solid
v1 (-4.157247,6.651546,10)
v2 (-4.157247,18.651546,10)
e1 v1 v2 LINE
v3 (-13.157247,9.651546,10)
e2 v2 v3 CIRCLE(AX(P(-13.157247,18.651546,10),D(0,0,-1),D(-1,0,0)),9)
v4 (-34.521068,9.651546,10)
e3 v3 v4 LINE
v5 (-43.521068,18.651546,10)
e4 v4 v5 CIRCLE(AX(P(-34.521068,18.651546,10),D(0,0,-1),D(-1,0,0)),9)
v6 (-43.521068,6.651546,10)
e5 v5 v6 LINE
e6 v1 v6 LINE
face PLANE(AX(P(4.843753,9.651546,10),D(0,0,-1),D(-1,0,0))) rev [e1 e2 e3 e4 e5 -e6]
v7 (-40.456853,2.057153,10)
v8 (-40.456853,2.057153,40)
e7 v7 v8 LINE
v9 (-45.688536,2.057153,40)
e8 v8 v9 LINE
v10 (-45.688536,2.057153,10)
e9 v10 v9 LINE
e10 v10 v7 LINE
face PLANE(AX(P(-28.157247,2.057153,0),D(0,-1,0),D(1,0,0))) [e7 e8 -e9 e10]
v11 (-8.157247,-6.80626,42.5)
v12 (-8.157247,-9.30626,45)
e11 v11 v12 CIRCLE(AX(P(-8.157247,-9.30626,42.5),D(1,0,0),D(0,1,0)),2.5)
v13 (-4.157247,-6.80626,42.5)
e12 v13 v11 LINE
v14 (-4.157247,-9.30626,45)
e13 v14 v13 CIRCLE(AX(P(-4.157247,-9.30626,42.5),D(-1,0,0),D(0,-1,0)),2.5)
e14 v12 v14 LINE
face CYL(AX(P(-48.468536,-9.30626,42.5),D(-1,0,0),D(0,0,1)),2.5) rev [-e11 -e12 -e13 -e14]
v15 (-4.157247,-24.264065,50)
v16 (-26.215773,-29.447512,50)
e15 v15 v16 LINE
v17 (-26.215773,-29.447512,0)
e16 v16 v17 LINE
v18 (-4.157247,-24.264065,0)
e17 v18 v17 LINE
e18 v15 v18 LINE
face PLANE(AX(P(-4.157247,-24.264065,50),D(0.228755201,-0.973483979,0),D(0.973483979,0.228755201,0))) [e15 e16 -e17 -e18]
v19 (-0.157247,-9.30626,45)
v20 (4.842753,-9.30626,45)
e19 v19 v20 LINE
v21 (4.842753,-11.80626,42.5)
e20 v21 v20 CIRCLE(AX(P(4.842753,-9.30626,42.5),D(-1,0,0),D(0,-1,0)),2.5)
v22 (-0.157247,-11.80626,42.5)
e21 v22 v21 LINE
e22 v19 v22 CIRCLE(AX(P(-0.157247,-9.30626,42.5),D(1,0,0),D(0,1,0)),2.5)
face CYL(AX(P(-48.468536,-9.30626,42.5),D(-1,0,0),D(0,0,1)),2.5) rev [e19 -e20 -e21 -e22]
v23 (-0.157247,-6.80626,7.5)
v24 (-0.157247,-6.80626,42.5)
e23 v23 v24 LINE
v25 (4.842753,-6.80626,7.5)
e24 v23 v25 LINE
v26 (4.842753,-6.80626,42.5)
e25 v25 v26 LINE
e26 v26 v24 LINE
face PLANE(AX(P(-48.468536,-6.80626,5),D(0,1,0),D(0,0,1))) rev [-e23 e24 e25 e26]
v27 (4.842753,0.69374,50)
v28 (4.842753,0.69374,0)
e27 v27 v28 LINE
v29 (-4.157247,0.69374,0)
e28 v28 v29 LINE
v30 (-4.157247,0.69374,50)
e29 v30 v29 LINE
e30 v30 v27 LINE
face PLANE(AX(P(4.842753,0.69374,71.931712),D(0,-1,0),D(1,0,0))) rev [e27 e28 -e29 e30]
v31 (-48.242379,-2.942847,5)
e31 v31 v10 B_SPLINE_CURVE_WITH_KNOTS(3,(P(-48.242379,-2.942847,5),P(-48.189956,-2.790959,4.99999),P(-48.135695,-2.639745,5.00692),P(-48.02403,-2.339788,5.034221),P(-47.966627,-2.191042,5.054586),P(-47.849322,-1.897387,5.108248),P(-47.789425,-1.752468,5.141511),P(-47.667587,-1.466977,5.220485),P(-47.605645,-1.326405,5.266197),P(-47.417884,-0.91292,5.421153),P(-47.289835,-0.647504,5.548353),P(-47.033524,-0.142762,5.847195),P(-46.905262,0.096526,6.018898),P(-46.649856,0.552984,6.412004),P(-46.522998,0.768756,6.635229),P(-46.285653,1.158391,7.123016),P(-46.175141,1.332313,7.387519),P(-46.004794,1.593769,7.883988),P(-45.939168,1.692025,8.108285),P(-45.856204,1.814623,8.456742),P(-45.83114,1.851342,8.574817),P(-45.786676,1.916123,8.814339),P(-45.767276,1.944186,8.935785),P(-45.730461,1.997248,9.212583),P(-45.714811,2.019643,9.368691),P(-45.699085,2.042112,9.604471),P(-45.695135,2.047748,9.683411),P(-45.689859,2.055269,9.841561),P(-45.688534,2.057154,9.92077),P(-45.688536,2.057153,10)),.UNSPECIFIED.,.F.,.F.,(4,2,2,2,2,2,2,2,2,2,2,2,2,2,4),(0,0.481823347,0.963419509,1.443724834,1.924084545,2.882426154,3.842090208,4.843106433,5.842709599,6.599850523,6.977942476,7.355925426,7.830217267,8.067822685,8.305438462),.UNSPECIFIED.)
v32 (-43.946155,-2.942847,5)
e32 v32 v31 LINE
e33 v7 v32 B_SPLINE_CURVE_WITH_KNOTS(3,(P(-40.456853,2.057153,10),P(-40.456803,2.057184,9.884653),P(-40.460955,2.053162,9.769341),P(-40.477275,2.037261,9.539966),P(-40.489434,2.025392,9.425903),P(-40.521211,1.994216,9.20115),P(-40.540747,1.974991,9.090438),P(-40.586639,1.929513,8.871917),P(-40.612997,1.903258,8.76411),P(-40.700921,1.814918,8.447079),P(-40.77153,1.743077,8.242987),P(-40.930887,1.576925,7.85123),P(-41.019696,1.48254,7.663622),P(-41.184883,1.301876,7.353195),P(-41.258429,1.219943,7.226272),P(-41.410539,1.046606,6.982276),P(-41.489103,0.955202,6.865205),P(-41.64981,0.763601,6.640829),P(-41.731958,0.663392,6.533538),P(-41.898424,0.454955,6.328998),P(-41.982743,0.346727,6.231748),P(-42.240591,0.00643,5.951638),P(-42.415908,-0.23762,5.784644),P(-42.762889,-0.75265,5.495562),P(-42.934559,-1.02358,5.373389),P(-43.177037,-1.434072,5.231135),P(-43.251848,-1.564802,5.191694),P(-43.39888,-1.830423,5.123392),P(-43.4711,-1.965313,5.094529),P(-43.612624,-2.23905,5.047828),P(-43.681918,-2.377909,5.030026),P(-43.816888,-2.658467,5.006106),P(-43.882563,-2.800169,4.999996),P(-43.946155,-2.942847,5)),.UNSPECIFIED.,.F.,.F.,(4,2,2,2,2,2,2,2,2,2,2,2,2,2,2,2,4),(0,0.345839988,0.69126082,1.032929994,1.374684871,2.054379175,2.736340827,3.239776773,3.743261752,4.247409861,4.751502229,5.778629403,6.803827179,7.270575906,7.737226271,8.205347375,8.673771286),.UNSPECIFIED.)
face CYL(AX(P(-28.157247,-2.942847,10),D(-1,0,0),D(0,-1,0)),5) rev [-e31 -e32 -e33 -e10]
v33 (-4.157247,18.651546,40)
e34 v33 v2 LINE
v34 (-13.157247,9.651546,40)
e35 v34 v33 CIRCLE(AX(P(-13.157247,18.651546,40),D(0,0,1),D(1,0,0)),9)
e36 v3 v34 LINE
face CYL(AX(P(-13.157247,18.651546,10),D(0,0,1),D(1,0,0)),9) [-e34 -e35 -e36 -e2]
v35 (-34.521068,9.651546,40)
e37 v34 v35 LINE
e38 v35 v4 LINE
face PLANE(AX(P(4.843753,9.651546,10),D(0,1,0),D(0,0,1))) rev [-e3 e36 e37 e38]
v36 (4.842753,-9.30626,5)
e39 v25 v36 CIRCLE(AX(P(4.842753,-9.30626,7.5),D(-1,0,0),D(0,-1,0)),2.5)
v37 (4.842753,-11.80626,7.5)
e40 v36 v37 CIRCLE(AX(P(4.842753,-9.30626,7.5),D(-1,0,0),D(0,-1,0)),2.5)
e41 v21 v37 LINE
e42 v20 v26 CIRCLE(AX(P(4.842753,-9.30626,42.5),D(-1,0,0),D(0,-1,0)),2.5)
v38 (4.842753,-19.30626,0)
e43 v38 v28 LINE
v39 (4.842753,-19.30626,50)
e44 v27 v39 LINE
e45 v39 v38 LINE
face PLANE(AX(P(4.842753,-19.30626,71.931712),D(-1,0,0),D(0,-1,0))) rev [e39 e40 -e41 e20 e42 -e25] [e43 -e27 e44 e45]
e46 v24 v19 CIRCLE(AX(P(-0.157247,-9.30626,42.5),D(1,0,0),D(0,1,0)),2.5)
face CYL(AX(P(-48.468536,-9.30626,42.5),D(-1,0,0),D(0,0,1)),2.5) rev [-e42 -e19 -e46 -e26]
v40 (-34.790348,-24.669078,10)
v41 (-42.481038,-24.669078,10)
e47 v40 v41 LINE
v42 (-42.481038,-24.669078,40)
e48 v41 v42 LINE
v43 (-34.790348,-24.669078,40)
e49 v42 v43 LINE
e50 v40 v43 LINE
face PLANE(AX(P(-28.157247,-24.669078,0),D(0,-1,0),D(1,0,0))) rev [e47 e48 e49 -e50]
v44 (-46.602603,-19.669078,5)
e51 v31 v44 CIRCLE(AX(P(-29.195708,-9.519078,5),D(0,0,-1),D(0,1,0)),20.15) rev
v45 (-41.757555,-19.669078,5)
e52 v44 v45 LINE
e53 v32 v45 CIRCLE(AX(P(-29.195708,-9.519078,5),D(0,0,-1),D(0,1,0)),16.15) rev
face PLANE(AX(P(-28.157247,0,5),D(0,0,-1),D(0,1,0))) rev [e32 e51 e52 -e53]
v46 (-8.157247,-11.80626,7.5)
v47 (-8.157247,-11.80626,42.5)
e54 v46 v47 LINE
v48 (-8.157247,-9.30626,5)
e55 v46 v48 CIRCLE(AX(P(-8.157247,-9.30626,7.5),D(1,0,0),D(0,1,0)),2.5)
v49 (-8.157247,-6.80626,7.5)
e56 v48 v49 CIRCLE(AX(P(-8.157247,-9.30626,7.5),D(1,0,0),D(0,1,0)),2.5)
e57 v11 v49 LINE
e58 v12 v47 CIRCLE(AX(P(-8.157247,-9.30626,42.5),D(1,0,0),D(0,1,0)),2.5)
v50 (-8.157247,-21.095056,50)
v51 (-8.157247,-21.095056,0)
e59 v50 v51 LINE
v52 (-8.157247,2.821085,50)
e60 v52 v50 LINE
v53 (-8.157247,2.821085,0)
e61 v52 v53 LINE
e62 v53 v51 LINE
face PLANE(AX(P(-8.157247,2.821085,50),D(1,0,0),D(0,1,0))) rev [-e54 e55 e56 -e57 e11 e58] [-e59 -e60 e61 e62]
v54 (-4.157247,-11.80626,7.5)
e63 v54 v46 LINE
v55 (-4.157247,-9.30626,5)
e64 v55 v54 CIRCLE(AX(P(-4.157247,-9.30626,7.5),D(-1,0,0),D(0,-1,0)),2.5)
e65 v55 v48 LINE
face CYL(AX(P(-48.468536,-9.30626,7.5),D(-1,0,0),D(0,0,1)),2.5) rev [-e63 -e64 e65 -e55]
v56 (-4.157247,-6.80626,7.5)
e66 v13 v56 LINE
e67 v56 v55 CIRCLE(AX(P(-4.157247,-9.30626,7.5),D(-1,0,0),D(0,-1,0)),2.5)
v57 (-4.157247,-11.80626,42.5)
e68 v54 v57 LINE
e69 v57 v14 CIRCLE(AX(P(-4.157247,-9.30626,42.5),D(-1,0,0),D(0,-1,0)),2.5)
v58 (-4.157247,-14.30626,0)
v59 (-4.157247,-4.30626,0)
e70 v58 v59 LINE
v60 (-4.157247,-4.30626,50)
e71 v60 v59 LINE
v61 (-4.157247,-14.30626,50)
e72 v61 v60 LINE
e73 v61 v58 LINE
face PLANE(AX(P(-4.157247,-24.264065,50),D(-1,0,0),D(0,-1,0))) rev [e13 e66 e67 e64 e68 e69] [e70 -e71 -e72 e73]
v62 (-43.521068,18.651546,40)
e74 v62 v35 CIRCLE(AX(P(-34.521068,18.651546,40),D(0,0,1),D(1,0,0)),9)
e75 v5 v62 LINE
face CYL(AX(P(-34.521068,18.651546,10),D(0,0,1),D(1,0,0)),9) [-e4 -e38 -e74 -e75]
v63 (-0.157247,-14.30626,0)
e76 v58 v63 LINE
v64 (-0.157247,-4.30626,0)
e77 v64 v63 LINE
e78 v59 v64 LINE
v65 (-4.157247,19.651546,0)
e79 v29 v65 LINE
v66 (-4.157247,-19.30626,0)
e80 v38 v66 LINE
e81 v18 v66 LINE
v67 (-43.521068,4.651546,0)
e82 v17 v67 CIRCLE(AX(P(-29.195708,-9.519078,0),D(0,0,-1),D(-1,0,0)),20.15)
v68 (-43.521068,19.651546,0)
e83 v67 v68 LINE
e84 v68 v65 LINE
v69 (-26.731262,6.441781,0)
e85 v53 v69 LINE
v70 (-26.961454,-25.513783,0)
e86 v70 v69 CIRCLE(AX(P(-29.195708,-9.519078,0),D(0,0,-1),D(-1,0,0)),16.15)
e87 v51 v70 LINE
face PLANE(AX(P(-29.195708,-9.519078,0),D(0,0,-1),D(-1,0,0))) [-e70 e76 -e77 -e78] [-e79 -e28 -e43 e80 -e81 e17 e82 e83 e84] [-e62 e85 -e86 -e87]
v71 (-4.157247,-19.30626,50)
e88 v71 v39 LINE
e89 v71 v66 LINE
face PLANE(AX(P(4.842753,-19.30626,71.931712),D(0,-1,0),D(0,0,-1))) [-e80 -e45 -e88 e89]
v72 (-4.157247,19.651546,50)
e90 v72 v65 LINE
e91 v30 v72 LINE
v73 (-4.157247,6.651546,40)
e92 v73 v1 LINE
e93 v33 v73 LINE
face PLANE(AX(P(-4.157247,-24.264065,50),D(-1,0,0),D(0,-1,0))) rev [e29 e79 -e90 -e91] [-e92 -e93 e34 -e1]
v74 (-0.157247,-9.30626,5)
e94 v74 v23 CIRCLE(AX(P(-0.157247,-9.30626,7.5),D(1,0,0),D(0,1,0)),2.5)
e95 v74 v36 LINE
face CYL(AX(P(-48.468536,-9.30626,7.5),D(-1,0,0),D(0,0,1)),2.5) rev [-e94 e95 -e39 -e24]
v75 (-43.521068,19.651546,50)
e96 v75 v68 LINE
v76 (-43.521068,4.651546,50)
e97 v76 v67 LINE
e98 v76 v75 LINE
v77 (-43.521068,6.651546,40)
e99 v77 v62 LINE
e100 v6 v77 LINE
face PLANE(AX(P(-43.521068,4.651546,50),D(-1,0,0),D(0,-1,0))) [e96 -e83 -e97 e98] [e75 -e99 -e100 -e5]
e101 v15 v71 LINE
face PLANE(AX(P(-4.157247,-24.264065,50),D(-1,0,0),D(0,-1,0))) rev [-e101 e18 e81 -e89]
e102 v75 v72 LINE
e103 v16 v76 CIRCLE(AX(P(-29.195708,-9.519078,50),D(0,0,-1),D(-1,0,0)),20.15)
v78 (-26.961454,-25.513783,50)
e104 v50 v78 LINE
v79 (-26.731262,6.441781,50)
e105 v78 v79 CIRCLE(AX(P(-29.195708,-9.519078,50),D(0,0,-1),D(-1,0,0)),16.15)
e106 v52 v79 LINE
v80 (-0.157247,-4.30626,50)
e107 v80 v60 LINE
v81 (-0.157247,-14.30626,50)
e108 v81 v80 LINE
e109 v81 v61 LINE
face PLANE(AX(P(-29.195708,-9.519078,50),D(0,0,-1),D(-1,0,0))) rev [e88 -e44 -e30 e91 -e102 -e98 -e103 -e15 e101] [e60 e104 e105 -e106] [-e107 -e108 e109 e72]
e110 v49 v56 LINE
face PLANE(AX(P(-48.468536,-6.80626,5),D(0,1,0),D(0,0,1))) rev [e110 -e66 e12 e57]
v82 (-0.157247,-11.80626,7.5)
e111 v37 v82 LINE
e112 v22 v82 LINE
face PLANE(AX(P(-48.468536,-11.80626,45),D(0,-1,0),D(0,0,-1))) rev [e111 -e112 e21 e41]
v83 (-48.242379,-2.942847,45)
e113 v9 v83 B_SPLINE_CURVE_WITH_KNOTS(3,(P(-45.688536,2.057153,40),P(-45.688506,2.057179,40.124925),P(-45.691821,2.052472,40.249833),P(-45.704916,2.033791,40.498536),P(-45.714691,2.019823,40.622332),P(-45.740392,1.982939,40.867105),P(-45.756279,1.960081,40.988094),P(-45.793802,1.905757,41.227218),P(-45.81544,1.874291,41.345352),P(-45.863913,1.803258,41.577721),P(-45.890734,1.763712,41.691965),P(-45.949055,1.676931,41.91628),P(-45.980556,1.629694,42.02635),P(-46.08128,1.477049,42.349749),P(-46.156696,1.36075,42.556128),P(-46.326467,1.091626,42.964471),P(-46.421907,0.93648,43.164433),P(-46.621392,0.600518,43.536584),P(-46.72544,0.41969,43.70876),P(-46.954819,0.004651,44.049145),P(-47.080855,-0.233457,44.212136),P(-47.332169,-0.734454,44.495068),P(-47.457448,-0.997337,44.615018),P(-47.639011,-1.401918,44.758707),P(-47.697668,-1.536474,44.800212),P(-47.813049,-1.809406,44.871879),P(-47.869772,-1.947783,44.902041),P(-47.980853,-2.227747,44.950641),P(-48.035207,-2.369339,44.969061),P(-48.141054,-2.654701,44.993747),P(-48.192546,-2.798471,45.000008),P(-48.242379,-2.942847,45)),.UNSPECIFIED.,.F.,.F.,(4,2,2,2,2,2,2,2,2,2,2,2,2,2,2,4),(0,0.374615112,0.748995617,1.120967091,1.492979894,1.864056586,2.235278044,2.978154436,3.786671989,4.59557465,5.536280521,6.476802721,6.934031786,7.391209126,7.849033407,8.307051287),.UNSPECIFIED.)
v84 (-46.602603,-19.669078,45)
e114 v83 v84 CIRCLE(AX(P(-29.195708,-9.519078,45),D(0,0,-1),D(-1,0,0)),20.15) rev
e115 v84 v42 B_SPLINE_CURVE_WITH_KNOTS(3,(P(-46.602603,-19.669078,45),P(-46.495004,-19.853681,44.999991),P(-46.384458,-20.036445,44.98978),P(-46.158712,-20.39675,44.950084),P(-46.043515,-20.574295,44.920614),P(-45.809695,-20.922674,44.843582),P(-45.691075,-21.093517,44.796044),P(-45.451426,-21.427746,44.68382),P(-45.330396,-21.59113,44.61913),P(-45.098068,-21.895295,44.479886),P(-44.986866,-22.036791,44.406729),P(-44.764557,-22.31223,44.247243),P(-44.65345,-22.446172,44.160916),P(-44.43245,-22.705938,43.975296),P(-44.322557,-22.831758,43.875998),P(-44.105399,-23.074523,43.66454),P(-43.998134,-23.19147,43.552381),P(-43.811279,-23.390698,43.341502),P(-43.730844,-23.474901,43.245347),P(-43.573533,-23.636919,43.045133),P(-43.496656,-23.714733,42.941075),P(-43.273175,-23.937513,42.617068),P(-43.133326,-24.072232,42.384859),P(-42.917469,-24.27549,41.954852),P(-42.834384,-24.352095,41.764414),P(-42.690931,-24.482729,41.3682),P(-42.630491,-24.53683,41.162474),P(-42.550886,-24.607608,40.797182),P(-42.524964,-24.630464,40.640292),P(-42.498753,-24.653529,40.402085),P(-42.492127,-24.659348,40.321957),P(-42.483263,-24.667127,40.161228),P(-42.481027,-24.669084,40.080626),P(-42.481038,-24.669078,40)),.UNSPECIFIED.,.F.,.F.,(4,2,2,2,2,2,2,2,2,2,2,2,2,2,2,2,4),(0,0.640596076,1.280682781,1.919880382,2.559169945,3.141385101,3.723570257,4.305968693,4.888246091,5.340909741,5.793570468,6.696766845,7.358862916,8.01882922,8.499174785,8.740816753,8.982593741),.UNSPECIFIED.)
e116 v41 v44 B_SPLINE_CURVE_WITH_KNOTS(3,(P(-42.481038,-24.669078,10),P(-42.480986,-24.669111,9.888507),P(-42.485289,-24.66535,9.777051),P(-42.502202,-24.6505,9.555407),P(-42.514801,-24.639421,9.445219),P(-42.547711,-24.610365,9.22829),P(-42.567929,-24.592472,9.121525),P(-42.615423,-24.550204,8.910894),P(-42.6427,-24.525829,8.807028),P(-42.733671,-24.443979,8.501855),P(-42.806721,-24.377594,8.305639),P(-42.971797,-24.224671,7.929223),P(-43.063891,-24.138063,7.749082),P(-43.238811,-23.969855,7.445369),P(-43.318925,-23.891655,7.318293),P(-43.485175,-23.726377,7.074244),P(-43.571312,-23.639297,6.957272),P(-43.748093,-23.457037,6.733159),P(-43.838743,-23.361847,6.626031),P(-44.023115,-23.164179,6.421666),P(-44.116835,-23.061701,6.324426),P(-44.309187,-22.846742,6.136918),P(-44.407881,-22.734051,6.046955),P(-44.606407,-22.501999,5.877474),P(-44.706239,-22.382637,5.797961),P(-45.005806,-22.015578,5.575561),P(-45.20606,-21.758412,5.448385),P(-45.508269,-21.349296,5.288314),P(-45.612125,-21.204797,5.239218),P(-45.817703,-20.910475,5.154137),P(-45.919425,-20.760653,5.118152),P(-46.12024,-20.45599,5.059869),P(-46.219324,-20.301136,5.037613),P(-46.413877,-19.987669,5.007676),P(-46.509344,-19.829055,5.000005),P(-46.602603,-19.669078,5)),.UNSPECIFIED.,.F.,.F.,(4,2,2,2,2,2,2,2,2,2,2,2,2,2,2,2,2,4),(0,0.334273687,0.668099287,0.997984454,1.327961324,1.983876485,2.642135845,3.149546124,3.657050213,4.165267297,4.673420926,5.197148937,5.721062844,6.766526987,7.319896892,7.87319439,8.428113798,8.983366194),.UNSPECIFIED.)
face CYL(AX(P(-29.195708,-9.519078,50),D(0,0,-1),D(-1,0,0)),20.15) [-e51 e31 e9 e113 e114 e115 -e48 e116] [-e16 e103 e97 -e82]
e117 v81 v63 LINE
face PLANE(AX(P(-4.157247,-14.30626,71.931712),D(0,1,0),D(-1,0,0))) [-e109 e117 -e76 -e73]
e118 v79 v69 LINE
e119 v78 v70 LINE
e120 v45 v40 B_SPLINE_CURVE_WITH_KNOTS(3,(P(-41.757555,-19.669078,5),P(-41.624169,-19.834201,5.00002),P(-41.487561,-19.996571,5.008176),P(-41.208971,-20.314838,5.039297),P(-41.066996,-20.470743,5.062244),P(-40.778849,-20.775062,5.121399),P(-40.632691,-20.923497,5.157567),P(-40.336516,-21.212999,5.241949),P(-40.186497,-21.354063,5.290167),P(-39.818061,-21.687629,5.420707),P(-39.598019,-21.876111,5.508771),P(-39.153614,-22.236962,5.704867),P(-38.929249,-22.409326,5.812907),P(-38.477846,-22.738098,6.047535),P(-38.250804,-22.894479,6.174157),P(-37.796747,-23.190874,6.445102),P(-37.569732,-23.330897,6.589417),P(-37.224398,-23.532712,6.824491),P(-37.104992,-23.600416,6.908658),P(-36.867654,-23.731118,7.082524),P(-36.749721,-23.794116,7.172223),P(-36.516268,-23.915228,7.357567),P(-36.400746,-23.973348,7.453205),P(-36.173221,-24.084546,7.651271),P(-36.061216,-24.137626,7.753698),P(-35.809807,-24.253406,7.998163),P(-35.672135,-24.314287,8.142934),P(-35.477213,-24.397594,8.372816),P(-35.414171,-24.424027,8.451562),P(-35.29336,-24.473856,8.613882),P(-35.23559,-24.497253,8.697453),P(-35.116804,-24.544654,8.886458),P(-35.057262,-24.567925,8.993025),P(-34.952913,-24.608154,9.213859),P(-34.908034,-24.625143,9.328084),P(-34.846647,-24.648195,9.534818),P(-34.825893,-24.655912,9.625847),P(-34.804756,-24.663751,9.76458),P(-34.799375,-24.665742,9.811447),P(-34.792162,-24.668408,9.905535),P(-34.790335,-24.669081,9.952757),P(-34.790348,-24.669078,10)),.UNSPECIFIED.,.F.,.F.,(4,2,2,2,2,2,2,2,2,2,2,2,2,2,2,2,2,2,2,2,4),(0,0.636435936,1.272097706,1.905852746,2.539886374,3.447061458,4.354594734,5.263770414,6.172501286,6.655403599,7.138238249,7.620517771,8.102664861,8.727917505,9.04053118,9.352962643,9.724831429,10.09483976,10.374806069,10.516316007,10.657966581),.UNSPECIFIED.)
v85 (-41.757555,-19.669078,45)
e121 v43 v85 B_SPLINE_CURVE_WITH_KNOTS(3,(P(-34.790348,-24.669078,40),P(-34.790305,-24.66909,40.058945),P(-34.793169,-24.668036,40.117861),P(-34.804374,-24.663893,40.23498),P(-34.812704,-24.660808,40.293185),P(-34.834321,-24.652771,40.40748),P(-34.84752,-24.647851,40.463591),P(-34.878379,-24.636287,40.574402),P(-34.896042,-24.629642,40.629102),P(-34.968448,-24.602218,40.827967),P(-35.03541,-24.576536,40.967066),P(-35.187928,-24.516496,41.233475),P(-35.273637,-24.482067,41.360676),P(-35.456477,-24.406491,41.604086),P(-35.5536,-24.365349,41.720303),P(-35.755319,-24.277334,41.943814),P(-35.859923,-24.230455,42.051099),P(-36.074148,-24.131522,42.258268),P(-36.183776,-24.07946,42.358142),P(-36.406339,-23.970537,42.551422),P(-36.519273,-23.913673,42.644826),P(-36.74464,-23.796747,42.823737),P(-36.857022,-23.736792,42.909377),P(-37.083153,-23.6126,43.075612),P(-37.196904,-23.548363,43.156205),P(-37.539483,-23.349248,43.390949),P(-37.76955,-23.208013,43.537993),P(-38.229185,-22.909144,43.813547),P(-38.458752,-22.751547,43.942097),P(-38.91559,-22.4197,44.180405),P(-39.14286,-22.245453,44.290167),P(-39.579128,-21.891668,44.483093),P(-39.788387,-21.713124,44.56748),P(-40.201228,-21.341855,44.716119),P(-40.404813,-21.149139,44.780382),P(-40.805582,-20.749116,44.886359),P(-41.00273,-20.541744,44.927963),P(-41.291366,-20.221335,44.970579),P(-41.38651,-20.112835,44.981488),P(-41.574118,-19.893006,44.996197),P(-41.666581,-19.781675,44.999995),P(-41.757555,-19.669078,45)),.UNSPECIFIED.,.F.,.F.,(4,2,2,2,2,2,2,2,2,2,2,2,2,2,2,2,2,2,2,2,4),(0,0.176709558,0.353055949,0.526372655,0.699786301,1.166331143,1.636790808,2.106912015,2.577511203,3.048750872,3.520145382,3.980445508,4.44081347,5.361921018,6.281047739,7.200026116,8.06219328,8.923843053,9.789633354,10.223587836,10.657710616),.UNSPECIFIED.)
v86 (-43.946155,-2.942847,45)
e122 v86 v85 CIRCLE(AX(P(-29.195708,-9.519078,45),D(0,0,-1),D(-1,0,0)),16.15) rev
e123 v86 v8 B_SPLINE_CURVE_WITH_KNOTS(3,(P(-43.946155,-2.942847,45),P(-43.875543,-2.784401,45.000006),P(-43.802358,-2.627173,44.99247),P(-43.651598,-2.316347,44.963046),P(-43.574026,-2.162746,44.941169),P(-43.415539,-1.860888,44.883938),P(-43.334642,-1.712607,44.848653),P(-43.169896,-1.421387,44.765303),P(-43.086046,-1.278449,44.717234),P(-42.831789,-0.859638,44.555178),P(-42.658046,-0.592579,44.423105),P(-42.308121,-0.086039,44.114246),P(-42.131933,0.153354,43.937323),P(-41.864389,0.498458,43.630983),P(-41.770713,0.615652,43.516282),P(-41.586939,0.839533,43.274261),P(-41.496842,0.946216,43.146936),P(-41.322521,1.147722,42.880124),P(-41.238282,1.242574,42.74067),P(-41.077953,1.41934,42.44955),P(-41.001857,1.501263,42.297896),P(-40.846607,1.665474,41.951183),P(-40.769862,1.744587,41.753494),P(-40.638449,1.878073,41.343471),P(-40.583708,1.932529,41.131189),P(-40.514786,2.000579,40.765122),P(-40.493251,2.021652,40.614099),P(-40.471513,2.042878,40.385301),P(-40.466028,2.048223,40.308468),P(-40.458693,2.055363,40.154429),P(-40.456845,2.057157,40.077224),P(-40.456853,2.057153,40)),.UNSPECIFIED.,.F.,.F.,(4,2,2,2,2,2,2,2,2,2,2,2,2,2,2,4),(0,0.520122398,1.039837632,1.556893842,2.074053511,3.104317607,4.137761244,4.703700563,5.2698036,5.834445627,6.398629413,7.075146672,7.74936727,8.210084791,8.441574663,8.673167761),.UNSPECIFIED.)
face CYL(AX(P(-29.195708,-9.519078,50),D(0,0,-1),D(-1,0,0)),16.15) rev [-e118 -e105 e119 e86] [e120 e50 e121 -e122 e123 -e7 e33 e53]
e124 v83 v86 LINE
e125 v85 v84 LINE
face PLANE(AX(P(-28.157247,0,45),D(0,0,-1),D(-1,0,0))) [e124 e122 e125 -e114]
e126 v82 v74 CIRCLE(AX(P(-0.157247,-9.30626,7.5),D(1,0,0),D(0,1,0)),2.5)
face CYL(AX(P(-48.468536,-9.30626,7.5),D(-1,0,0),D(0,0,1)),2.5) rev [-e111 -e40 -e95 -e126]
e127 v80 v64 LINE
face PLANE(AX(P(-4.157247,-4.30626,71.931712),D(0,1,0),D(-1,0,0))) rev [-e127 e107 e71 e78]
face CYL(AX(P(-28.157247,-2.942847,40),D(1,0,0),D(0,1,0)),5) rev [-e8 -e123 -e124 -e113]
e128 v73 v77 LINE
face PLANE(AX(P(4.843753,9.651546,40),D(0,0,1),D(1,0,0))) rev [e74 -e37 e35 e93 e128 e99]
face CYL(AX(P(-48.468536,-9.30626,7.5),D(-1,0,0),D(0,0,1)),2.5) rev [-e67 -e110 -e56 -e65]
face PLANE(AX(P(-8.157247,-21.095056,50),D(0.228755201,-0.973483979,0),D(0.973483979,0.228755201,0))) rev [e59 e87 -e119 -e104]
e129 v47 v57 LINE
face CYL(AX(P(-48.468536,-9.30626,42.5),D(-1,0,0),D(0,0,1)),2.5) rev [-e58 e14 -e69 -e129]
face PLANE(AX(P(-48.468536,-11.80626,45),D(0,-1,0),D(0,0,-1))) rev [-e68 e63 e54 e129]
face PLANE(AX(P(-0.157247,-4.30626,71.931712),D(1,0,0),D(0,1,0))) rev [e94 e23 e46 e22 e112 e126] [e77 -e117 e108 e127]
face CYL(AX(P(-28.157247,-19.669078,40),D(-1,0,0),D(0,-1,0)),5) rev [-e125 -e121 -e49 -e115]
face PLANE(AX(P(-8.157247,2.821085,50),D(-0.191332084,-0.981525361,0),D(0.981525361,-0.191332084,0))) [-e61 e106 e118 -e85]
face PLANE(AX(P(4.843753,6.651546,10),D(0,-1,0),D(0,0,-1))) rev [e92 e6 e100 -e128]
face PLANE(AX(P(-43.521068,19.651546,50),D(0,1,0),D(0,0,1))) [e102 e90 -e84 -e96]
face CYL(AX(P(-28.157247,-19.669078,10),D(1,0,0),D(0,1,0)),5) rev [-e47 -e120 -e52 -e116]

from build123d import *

# Parameters (mm, degrees)
SALIENTE_EXTRUIR1_DEPTH = 50
SALIENTE_EXTRUIR2_DEPTH = 50
CORTAR_EXTRUIR12_REACH  = 81.477
CROQUIS12_W             = 40
CROQUIS12_H             = 5
REDONDEO1_R             = 2.5
CROQUIS16_W             = 40
CROQUIS16_H             = 26.726230184
CORTAR_EXTRUIR17_DEPTH  = 20
REDONDEO2_R             = 5
CORTAR_EXTRUIR18_REACH  = 77.626
CROQUIS21_W             = 30
CROQUIS21_H             = 3
REDONDEO3_R             = 9


with BuildPart() as part:
    # Croquis3 → Saliente-Extruir1 (new body)
    with BuildSketch(Plane.XY):
        with BuildLine():
            Line((-4.157247249, -24.2640649), (-26.215773458, -29.447511872))
            ThreePointArc((-26.215773458, -29.447511872), (-47.164183017, -18.638090647), (-43.521067646, 4.65154569))
            Line((-43.521067646, 4.65154569), (-43.521067646, 19.65154569))
            Line((-43.521067646, 19.65154569), (-4.157247249, 19.65154569))
            Line((-4.157247249, 19.65154569), (-4.157247249, -24.2640649))
        make_face()
        with BuildLine():
            Line((-8.157247249, 2.82108494), (-26.731262437, 6.441781026))
            ThreePointArc((-26.731262437, 6.441781026), (-45.345288804, -9.402744466), (-26.961453667, -25.513783269))
            Line((-26.961453667, -25.513783269), (-8.157247249, -21.095056202))
            Line((-8.157247249, -21.095056202), (-8.157247249, 2.82108494))
        make_face(mode=Mode.SUBTRACT)
    extrude(amount=SALIENTE_EXTRUIR1_DEPTH)

    # Croquis11 → Saliente-Extruir2 (add)
    with BuildSketch(Plane(origin=(0, 0, 0), x_dir=(-1, 0, 0), z_dir=(0, 0, -1))):
        Polygon((-4.842752751, -19.306259605), (-4.842752751, 0.693740395), (4.157247249, 0.693740395), (4.157247249, -4.306259605), (0.157247249, -4.306259605), (0.157247249, -14.306259605), (4.157247249, -14.306259605), (4.157247249, -19.306259605), align=None)
    extrude(amount=-SALIENTE_EXTRUIR2_DEPTH)

    # Cortar-Extruir12: up to this face of the body (flat: up to its plane)
    cortar_extruir12_end = Plane(part.part.faces().sort_by_distance((-8.157247249, -9.136985631, 25))[0])
    # Croquis12 → Cortar-Extruir12 (cut, up to the picked face)
    with BuildSketch(Plane(origin=(4.842752751, 0, 0), x_dir=(0, 0, -1), z_dir=(1, 0, 0)), mode=Mode.PRIVATE) as cortar_extruir12_sk1:
        with Locations((-25, -9.306259605)):
            Rectangle(CROQUIS12_W, CROQUIS12_H)
    cortar_extruir12_tool1 = split(extrude(cortar_extruir12_sk1.sketch, amount=-CORTAR_EXTRUIR12_REACH, mode=Mode.PRIVATE), bisect_by=cortar_extruir12_end, keep=Keep.BOTH, mode=Mode.PRIVATE)
    add(cortar_extruir12_tool1.solids().sort_by(Axis((4.842753, -9.30626, 25), (-1, 0, 0)))[0], mode=Mode.SUBTRACT)

    # Redondeo1
    redondeo1_edges = [part.edges().sort_by_distance(p)[0] for p in [
        (2.342752751, -6.806259605, 5),
        (2.342752751, -6.806259605, 45),
        (-6.157247249, -11.806259605, 5),
        (-6.157247249, -6.806259605, 5),
        (-6.157247249, -11.806259605, 45),
        (-6.157247249, -6.806259605, 45),
        (2.342752751, -11.806259605, 5),
        (2.342752751, -11.806259605, 45),
    ]]
    fillet(redondeo1_edges, radius=REDONDEO1_R - 0.0001)  # a hair under: the kernel refuses the full size

    # Croquis16 → Cortar-Extruir17 (cut, symmetric)
    with BuildSketch(Plane.ZY.offset(48.157247249)):
        with Locations((25, -11.305962539)):
            Rectangle(CROQUIS16_W, CROQUIS16_H)
    extrude(amount=CORTAR_EXTRUIR17_DEPTH, both=True, mode=Mode.SUBTRACT)

    # Redondeo2
    redondeo2_edges = [part.edges().sort_by_distance(p)[0] for p in [
        (-43.072694771, 2.057152553, 45),
        (-38.635693074, -24.669077631, 45),
        (-38.635693074, -24.669077631, 5),
        (-43.072694771, 2.057152553, 5),
    ]]
    fillet(redondeo2_edges, radius=REDONDEO2_R)

    # Croquis21 → Cortar-Extruir18 (cut, up to next)
    with BuildSketch(Plane.ZY.offset(43.521067646), mode=Mode.PRIVATE) as cortar_extruir18_sk1:
        with Locations((25, 8.15154569)):
            Rectangle(CROQUIS21_W, CROQUIS21_H)
    cortar_extruir18_tool1 = extrude(cortar_extruir18_sk1.sketch, amount=-CORTAR_EXTRUIR18_REACH, mode=Mode.PRIVATE) & part.part
    add(cortar_extruir18_tool1.solids().sort_by_distance((-43.521068, 8.151546, 25))[0], mode=Mode.SUBTRACT)

    # Redondeo3
    redondeo3_edges = [part.edges().sort_by_distance(p)[0] for p in [
        (-43.521067646, 9.65154569, 25),
        (-4.157247249, 9.65154569, 25),
    ]]
    fillet(redondeo3_edges, radius=REDONDEO3_R)


solid = part.part
